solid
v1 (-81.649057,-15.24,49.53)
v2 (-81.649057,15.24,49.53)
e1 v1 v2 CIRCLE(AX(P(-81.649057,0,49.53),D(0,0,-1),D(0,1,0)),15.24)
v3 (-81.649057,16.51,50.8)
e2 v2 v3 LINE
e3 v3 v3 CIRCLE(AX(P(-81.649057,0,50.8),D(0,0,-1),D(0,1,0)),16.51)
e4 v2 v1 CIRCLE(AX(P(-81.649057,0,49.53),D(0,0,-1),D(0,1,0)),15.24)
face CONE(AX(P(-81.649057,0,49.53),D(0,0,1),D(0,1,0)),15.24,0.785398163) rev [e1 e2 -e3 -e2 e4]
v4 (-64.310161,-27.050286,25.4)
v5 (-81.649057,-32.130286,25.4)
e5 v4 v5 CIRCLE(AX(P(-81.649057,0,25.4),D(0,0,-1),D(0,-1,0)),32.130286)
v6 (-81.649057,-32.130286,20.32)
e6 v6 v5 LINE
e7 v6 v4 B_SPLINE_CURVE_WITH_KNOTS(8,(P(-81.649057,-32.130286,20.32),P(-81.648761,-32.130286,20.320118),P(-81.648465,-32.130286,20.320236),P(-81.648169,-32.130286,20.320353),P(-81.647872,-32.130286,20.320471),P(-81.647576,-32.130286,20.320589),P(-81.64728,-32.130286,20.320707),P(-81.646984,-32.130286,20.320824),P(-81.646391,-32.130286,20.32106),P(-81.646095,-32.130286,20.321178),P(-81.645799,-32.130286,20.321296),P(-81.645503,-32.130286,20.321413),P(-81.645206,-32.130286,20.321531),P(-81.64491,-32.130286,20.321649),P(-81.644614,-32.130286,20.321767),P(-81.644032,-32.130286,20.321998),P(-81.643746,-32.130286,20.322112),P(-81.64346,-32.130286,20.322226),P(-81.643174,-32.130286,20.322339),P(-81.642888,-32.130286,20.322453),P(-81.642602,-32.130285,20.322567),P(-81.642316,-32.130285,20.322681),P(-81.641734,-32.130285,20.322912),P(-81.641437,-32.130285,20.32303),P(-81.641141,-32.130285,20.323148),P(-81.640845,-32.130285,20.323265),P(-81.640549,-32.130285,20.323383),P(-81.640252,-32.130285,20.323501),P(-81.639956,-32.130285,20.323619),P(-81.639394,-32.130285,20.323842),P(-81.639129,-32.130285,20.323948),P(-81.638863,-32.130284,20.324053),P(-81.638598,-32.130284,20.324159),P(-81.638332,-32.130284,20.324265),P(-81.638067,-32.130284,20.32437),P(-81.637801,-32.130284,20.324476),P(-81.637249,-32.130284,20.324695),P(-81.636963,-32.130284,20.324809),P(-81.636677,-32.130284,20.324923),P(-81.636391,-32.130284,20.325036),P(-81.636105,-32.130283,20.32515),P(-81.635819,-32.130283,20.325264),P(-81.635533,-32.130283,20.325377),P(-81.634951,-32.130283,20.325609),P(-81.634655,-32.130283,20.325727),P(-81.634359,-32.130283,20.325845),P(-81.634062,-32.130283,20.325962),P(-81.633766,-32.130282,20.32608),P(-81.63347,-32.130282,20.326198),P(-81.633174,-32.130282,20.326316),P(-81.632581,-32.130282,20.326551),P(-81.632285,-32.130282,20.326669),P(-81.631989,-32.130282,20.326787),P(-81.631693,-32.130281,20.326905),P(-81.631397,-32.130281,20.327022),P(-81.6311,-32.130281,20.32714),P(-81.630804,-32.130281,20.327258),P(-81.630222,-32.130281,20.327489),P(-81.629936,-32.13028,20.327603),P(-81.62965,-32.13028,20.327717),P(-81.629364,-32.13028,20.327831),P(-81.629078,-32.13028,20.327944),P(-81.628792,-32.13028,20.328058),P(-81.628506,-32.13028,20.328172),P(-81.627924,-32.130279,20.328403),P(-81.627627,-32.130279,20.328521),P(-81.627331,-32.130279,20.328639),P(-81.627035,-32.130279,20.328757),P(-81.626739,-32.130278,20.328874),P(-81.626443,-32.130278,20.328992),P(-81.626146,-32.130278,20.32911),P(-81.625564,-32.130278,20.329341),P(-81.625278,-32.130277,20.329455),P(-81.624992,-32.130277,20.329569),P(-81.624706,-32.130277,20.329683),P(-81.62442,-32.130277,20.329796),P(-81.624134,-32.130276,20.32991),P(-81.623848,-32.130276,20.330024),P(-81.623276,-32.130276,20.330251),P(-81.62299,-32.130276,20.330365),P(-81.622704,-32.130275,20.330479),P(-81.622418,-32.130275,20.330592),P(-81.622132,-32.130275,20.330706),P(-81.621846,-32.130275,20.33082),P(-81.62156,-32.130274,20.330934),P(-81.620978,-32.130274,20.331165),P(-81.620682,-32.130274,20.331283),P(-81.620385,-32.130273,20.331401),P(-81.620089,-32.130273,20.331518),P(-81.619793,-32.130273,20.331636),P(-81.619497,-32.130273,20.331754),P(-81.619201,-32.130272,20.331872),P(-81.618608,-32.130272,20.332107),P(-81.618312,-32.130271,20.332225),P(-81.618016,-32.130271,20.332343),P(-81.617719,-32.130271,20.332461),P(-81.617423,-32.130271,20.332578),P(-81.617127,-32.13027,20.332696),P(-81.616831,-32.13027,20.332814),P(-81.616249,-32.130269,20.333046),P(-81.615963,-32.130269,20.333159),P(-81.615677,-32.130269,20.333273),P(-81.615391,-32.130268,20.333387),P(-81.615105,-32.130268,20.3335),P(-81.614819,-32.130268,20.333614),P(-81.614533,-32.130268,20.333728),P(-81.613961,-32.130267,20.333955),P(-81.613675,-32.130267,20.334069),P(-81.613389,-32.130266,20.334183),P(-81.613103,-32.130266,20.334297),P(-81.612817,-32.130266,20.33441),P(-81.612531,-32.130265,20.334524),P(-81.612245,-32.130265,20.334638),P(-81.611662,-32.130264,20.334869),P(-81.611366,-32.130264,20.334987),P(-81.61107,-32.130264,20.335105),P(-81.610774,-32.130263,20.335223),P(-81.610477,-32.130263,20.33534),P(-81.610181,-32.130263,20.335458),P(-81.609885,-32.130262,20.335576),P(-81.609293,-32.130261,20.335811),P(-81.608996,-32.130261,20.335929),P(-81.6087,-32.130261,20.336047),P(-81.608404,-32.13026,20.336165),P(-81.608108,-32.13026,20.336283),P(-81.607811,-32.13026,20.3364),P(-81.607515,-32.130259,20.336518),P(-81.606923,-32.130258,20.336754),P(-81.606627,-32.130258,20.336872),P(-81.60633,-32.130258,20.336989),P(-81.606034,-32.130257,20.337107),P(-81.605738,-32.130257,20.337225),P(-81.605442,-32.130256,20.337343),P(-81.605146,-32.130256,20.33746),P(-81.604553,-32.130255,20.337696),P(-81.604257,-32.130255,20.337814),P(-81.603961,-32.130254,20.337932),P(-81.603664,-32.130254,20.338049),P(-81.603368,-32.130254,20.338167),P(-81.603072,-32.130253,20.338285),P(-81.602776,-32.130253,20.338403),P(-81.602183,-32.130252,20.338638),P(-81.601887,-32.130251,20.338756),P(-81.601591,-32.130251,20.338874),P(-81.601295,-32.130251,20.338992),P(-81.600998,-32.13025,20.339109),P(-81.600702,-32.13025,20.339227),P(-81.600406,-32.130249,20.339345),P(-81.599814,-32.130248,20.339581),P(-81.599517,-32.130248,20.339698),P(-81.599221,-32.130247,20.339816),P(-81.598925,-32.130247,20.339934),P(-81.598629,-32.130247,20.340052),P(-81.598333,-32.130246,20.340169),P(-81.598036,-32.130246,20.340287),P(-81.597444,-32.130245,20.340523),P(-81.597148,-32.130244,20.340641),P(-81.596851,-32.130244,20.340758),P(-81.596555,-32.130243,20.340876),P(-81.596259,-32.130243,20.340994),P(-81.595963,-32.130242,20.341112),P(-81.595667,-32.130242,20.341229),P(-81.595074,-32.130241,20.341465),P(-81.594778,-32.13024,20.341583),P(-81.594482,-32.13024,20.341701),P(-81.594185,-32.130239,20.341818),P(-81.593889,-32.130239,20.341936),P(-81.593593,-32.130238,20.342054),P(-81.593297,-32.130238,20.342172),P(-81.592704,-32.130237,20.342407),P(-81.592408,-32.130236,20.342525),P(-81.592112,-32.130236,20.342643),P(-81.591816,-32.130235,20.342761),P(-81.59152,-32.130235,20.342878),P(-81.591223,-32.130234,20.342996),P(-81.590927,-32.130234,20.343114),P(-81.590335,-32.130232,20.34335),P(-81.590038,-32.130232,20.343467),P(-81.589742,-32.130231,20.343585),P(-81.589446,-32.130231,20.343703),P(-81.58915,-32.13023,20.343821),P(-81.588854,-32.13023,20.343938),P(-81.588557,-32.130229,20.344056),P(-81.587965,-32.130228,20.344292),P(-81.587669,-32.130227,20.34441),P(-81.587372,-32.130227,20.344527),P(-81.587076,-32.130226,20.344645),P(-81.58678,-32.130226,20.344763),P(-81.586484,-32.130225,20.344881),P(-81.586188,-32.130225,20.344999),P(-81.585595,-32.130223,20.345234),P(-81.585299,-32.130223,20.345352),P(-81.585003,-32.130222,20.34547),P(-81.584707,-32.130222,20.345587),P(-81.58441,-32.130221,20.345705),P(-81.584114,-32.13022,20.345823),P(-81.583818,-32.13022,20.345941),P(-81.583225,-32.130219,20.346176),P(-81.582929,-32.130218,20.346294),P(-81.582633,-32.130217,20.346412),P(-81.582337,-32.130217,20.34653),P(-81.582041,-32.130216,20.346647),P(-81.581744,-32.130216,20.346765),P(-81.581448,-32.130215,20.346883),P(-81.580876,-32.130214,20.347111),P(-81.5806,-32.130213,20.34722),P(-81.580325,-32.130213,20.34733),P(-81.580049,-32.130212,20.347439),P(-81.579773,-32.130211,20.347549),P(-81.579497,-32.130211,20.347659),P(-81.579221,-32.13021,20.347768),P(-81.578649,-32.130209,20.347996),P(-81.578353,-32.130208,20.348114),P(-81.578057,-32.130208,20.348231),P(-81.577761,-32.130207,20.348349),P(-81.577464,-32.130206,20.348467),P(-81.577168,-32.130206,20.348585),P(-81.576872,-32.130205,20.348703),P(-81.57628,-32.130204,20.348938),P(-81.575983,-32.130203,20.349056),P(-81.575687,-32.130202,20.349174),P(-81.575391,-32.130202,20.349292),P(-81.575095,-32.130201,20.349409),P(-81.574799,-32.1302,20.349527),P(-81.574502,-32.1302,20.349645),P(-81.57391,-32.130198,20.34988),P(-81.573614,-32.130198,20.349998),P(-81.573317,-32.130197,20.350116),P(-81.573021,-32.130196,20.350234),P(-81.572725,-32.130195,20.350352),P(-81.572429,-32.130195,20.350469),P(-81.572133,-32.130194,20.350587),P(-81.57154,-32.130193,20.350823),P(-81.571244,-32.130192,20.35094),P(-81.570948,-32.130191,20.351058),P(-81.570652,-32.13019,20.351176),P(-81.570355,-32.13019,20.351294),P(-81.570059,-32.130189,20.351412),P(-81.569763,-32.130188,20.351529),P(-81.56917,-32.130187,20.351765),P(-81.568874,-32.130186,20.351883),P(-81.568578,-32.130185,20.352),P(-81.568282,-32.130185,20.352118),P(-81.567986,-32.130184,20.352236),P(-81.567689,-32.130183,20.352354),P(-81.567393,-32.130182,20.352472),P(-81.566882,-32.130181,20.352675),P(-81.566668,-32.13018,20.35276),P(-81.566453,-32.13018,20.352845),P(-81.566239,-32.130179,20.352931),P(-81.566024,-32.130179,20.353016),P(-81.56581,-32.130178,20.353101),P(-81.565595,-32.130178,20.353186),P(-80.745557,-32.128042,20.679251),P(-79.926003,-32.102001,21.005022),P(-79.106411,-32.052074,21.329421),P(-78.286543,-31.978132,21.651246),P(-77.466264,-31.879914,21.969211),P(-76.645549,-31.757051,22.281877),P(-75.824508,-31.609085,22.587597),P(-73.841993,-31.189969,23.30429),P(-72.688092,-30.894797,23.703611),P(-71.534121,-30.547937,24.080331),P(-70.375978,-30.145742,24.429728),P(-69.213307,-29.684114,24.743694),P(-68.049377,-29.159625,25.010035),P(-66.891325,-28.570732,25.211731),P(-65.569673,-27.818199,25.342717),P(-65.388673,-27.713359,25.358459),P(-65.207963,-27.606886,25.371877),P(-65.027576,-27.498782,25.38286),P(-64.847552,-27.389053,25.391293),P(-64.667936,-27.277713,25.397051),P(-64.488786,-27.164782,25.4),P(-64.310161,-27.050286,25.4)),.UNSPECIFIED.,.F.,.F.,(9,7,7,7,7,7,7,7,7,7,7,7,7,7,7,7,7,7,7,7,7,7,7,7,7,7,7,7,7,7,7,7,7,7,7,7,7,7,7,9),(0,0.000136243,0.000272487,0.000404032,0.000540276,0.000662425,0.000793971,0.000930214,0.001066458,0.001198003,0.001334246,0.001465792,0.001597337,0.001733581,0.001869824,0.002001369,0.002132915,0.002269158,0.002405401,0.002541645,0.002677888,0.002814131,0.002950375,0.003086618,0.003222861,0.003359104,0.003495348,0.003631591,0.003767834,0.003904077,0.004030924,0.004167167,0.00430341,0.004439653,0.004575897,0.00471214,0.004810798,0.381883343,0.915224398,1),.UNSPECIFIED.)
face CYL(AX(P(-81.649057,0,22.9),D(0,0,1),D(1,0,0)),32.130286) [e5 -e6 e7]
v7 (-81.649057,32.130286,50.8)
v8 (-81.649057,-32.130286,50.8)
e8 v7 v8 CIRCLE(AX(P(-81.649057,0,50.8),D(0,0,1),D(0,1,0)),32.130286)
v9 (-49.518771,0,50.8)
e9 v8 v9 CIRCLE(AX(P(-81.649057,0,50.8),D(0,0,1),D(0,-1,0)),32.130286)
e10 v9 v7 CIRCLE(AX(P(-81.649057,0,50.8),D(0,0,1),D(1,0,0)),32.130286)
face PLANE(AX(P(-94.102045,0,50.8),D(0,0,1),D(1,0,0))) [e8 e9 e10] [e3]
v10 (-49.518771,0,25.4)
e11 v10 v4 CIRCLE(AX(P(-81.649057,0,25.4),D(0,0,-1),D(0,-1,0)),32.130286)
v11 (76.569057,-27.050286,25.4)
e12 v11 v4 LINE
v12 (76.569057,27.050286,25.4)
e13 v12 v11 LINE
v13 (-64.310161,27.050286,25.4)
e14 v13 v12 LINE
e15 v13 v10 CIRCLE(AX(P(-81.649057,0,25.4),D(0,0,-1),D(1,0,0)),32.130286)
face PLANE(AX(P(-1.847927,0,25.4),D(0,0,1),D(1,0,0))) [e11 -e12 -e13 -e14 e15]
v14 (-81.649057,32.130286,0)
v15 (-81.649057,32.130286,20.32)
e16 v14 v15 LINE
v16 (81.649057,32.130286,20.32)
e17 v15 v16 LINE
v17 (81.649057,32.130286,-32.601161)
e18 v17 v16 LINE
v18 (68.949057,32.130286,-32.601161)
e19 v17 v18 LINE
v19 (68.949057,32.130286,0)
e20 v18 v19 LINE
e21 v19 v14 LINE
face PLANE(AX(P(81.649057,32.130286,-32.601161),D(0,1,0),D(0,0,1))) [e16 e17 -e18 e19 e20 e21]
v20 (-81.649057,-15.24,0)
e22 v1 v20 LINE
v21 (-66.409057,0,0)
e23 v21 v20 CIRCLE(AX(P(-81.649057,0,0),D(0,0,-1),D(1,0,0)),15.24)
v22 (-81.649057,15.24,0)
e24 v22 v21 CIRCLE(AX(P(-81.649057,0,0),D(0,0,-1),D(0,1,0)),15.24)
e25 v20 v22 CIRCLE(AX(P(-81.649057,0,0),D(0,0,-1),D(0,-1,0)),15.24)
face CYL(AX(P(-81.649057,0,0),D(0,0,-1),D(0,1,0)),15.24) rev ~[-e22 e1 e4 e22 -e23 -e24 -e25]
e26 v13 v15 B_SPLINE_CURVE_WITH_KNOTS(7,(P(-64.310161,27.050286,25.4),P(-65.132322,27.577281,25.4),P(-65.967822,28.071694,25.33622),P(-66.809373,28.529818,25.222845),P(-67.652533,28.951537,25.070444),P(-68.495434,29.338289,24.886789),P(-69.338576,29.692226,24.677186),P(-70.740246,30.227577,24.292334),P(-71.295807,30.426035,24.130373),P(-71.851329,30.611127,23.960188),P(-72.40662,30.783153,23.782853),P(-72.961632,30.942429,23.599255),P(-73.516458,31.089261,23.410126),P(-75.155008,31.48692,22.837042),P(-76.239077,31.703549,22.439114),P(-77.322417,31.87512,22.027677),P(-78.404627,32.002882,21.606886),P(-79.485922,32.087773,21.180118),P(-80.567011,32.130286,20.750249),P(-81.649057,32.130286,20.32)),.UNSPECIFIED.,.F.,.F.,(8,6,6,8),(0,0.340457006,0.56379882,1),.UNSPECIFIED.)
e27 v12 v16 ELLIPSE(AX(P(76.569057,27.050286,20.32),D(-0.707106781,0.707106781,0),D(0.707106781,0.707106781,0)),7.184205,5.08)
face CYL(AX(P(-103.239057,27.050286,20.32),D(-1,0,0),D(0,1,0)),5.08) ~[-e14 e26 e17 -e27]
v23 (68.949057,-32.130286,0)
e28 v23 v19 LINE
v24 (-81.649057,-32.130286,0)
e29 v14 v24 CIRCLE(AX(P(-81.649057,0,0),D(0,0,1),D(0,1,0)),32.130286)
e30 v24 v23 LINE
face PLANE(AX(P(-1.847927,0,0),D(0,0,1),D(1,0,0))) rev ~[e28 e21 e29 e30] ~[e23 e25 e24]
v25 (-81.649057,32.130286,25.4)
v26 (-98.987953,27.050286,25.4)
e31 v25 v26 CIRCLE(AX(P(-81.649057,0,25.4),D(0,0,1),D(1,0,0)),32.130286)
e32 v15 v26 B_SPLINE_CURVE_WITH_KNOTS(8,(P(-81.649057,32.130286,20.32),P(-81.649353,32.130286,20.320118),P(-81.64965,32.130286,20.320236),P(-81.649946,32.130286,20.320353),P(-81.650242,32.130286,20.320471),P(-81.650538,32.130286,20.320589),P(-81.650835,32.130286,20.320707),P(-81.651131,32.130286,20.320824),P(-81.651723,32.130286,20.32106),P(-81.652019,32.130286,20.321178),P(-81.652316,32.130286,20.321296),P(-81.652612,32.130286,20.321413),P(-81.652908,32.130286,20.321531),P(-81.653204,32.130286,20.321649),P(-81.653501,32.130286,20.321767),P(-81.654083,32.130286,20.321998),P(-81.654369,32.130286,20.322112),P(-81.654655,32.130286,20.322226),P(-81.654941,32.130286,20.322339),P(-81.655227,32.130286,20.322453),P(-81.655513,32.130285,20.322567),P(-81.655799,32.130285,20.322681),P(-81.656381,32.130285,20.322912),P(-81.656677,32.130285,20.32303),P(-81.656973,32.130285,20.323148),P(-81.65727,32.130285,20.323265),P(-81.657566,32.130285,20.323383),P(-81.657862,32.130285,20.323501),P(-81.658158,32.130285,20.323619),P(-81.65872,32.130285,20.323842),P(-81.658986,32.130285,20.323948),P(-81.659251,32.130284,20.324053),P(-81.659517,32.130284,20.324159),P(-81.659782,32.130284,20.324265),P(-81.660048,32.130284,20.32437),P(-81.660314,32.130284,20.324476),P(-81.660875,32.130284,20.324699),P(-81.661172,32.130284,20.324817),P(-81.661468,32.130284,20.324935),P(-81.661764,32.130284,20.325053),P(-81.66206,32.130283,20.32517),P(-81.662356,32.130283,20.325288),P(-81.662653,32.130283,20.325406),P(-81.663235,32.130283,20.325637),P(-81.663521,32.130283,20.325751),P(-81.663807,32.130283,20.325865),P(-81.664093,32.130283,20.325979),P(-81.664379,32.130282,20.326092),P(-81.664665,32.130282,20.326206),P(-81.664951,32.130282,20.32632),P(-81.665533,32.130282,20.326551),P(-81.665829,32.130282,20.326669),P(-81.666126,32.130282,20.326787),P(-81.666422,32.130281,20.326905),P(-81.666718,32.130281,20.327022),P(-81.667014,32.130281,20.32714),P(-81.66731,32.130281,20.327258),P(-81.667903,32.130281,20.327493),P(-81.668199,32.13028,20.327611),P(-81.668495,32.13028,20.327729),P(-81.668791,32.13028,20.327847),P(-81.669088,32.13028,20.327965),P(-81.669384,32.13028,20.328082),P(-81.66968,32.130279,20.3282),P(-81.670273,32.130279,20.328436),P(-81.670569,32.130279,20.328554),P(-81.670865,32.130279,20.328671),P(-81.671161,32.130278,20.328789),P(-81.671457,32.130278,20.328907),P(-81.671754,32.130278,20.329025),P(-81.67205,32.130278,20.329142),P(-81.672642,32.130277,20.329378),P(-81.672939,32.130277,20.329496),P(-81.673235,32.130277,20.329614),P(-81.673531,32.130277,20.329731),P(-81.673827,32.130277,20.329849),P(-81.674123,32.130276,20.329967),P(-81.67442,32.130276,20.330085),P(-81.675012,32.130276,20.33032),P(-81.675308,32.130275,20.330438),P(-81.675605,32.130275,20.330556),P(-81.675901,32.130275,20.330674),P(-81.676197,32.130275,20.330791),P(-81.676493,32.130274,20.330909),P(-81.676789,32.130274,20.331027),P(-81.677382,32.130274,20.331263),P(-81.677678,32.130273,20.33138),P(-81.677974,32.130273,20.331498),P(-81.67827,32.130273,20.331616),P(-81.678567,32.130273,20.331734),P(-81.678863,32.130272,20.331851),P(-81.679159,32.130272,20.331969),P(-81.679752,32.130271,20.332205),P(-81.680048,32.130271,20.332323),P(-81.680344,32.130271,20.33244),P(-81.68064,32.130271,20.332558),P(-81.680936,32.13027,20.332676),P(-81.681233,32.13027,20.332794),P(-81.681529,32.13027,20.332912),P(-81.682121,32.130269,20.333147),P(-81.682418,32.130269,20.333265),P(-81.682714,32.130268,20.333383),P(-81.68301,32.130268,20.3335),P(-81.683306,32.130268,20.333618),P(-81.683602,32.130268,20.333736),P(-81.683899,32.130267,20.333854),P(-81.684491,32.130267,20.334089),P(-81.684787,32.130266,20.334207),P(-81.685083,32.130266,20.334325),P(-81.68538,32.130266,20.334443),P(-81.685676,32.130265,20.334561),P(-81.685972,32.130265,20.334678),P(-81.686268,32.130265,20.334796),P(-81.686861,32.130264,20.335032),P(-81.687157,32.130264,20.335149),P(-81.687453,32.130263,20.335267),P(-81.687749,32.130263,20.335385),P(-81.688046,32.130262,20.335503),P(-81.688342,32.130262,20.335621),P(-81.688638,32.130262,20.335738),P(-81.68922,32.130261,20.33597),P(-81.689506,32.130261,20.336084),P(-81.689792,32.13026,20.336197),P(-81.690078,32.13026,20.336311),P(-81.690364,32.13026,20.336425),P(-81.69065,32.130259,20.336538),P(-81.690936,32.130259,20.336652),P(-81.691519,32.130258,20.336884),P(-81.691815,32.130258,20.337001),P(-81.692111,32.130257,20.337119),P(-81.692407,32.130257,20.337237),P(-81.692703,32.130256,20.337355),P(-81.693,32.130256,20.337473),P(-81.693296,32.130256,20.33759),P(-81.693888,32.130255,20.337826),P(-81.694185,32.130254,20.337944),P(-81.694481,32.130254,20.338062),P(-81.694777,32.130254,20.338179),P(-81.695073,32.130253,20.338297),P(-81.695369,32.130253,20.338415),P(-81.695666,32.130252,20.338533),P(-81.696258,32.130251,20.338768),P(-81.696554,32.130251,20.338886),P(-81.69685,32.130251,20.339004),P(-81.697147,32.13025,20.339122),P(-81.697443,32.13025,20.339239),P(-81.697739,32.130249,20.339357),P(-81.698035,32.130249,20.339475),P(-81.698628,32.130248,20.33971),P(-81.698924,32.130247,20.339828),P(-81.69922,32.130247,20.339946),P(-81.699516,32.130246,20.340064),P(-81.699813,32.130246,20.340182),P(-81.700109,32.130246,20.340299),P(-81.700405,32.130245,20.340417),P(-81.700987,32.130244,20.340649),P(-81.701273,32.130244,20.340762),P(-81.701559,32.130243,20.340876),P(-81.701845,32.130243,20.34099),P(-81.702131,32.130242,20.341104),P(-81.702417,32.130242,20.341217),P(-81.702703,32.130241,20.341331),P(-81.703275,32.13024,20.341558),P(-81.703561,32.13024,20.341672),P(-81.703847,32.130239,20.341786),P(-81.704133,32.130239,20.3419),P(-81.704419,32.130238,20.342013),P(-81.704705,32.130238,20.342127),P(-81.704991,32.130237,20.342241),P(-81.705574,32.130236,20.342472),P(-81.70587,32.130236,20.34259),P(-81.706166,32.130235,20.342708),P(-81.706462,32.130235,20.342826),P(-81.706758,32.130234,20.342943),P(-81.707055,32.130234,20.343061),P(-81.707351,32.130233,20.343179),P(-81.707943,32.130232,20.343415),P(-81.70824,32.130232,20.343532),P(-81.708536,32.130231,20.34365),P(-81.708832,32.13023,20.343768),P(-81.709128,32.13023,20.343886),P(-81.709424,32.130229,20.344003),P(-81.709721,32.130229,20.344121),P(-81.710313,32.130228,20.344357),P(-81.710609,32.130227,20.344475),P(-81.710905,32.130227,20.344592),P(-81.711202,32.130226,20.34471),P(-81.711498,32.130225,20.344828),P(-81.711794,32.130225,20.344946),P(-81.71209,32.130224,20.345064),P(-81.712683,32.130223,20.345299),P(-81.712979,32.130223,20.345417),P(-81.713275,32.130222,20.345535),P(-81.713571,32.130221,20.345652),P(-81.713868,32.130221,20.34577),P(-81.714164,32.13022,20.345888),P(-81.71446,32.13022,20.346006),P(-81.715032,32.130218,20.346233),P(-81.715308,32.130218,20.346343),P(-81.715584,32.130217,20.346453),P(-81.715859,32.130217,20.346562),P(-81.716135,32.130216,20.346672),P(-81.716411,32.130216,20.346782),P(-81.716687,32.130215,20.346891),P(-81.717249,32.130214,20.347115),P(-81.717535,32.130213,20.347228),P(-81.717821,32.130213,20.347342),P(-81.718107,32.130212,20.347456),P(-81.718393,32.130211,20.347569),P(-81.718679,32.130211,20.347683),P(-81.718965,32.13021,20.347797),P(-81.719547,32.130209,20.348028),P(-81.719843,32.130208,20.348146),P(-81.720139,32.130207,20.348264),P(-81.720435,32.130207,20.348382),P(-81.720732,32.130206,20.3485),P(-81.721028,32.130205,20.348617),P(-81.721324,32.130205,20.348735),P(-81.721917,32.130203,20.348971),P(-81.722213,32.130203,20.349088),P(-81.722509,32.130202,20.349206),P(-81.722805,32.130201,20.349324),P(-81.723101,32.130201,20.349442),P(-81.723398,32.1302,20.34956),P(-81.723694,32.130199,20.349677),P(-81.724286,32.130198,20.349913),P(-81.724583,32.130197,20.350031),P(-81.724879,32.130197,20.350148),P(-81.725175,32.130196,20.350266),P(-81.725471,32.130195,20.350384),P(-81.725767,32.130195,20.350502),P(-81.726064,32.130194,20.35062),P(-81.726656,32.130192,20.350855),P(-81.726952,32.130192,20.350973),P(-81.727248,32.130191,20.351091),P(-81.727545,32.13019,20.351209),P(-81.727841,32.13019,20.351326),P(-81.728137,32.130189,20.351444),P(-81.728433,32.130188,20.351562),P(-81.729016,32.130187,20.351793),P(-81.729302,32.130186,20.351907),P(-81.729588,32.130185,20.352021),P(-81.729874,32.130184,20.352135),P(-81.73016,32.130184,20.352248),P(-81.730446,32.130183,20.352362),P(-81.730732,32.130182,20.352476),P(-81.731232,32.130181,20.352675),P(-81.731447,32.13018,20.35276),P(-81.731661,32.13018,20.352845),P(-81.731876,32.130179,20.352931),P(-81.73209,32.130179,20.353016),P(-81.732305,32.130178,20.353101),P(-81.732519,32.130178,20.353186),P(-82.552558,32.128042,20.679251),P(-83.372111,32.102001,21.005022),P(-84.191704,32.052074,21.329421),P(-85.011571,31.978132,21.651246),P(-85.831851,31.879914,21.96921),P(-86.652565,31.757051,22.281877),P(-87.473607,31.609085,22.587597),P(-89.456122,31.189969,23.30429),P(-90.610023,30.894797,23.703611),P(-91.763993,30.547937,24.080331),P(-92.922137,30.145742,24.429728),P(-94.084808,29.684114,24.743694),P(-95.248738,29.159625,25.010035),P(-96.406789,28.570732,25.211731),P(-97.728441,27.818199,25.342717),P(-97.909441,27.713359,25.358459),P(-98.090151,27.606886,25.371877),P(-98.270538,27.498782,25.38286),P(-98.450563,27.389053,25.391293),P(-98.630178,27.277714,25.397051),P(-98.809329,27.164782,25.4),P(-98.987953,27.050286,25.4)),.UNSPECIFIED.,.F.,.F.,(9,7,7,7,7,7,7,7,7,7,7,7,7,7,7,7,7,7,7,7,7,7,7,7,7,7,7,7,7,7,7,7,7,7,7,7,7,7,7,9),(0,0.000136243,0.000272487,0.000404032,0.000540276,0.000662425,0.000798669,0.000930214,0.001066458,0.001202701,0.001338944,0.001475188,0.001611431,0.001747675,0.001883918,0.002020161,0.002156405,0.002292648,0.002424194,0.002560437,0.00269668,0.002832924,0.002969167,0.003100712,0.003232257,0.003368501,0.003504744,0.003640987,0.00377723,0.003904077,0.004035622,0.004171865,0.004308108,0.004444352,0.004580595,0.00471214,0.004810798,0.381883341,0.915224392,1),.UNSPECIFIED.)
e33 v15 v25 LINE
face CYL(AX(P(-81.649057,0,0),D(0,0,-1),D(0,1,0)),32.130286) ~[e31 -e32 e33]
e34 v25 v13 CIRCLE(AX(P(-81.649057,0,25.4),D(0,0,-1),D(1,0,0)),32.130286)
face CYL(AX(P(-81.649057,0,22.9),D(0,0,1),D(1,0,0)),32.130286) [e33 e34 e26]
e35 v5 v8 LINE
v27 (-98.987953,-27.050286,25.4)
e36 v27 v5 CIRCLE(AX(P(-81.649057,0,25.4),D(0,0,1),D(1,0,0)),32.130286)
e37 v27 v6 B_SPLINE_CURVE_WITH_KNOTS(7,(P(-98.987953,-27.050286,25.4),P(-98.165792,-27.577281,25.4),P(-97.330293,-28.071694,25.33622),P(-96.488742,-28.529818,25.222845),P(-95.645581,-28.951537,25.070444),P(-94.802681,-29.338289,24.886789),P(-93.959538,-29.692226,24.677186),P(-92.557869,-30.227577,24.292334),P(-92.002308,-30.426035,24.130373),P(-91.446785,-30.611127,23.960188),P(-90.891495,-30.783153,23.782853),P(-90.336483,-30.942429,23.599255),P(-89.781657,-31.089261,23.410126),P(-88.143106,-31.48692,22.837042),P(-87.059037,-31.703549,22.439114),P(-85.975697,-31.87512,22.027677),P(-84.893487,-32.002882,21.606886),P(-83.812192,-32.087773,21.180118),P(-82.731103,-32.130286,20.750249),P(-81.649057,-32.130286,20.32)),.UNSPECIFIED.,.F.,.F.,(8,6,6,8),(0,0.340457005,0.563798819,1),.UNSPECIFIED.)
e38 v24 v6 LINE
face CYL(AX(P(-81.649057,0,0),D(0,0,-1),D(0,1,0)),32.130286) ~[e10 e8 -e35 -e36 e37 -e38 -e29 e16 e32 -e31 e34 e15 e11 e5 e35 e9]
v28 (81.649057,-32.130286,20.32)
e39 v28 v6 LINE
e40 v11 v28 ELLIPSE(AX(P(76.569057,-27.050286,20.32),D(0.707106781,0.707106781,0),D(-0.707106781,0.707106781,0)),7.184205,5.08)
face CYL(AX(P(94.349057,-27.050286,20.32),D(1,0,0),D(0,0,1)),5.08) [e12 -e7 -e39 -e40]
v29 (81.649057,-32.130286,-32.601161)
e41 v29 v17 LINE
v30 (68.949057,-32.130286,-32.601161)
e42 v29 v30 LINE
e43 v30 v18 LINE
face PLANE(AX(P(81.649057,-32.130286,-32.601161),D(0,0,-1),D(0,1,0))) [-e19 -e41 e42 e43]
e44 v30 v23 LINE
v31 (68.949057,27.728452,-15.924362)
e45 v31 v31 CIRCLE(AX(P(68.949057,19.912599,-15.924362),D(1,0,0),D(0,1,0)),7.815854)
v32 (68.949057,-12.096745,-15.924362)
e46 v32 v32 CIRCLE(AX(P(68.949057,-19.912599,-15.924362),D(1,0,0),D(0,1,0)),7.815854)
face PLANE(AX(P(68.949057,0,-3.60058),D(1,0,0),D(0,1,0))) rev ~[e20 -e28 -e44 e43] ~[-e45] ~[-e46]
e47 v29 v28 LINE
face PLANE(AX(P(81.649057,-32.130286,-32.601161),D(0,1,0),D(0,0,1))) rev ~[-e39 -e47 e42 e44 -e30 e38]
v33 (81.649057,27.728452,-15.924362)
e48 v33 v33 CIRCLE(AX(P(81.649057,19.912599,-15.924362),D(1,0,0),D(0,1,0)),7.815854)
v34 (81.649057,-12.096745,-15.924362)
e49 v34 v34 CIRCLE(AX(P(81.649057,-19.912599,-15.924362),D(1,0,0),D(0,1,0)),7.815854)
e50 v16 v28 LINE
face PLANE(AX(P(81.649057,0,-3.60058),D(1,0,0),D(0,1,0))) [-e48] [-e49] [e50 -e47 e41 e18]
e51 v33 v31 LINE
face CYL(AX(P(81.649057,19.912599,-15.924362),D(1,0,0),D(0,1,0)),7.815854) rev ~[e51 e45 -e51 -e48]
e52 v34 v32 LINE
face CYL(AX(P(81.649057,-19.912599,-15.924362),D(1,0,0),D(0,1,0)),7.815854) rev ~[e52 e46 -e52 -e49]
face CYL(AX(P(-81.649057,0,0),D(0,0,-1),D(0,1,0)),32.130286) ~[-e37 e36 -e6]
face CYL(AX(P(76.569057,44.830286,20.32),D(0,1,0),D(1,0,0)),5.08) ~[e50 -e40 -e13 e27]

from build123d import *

# Parameters (mm, degrees)
F1_DEPTH     = 25.4
F2_DEPTH     = 50.8
F3_W         = 64.2605721951
F3_H         = 58.0011609286
F3_R         = 7.8158537252
F4_DEPTH     = 12.7
F5_T1_DEPTH  = 89.6605721951
F5_T6_DEPTH  = 197.5881144994
F5_S7_R      = 32.1302860975
F5_T8_DEPTH  = 100
F5_T12_DEPTH = 197.5881144994
F5_S13_R     = 32.1302860975
F5_T14_DEPTH = 100


# Not quite as in the source:
# - a fillet or chamfer that OpenCascade refuses, or shapes differently, is made with other operations: its cross-section is extruded or revolved along the edge and cut away or added


with BuildPart() as f1:
    # F0 (on Top) → F1 (new body)
    with BuildSketch(Plane.XY):
        with BuildLine():
            Line((81.6490572497, -32.1302860975), (81.6490572497, 32.1302860975))
            Line((81.6490572497, 32.1302860975), (-81.6490572497, 32.1302860975))
            ThreePointArc((-81.6490572497, 32.1302860975), (-58.9295140687, 22.719543181), (-49.5187711522, 0))
            ThreePointArc((-49.5187711522, 0), (-58.9295140687, -22.719543181), (-81.6490572497, -32.1302860975))
            Line((-81.6490572497, -32.1302860975), (81.6490572497, -32.1302860975))
        make_face()
        with BuildLine():
            Line((-81.6490572497, 15.24), (-81.6490572497, 32.1302860975))
            ThreePointArc((-81.6490572497, 32.1302860975), (-113.7793433473, 0), (-81.6490572497, -32.1302860975))
            Line((-81.6490572497, -32.1302860975), (-81.6490572497, -15.24))
            ThreePointArc((-81.6490572497, -15.24), (-96.8890572497, 0), (-81.6490572497, 15.24))
        make_face()
        with BuildLine():
            ThreePointArc((-49.5187711522, 0), (-58.9295140687, 22.719543181), (-81.6490572497, 32.1302860975))
            Line((-81.6490572497, 32.1302860975), (-81.6490572497, 15.24))
            ThreePointArc((-81.6490572497, 15.24), (-70.8727499044, 10.7763073453), (-66.4090572497, 0))
            ThreePointArc((-66.4090572497, 0), (-70.8727499044, -10.7763073453), (-81.6490572497, -15.24))
            Line((-81.6490572497, -15.24), (-81.6490572497, -32.1302860975))
            ThreePointArc((-81.6490572497, -32.1302860975), (-58.9295140687, -22.719543181), (-49.5187711522, 0))
        make_face()
    extrude(amount=F1_DEPTH)

    # F0 (on Top) → F2 (join)
    with BuildSketch(Plane.XY):
        with BuildLine():
            Line((-81.6490572497, 15.24), (-81.6490572497, 32.1302860975))
            ThreePointArc((-81.6490572497, 32.1302860975), (-113.7793433473, 0), (-81.6490572497, -32.1302860975))
            Line((-81.6490572497, -32.1302860975), (-81.6490572497, -15.24))
            ThreePointArc((-81.6490572497, -15.24), (-96.8890572497, 0), (-81.6490572497, 15.24))
        make_face()
        with BuildLine():
            ThreePointArc((-49.5187711522, 0), (-58.9295140687, 22.719543181), (-81.6490572497, 32.1302860975))
            Line((-81.6490572497, 32.1302860975), (-81.6490572497, 15.24))
            ThreePointArc((-81.6490572497, 15.24), (-70.8727499044, 10.7763073453), (-66.4090572497, 0))
            ThreePointArc((-66.4090572497, 0), (-70.8727499044, -10.7763073453), (-81.6490572497, -15.24))
            Line((-81.6490572497, -15.24), (-81.6490572497, -32.1302860975))
            ThreePointArc((-81.6490572497, -32.1302860975), (-58.9295140687, -22.719543181), (-49.5187711522, 0))
        make_face()
    extrude(amount=F2_DEPTH)

    # F3 (on face) → F4 (join)
    with BuildSketch(Plane.YZ.offset(81.6490572497)):
        with Locations((0, -3.6005804643)):
            Rectangle(F3_W, F3_H)
        with Locations((-19.9125986546, -15.9243624657)):
            Circle(F3_R, mode=Mode.SUBTRACT)
        with Locations((19.9125986546, -15.9243624657)):
            Circle(F3_R, mode=Mode.SUBTRACT)
    extrude(amount=-F4_DEPTH)

    # F5: fillet of radius 5.08 on 3 edges, made by hand

    # F5_s2 → F5_t1 (cut)
    with BuildSketch(Plane.XZ.offset(-44.8302860975)):
        with BuildLine():
            ThreePointArc((81.6490572497, 20.32), (80.1611596982, 23.9121024484), (76.5690572497, 25.4))
            Line((76.5690572497, 25.4), (81.6490572497, 25.4))
            Line((81.6490572497, 25.4), (81.6490572497, 20.32))
        make_face()
    extrude(amount=F5_T1_DEPTH, mode=Mode.SUBTRACT)


with BuildPart() as f5_tool4:
    # F5_s5 → F5_t6 (new body)
    with BuildSketch(Plane.YZ.offset(94.3490572497)):
        with BuildLine():
            ThreePointArc((-27.0502860975, 25.4), (-30.642388546, 23.9121024484), (-32.1302860975, 20.32))
            Line((-32.1302860975, 20.32), (-32.1302860975, 25.4))
            Line((-32.1302860975, 25.4), (-27.0502860975, 25.4))
        make_face()
    extrude(amount=-F5_T6_DEPTH)

    # F5_s7 → F5_t8 (cut, symmetric)
    with BuildSketch(Plane.XY.offset(22.9)):
        with Locations((-81.6490572497, 0)):
            Circle(F5_S7_R)
    extrude(amount=F5_T8_DEPTH, both=True, mode=Mode.SUBTRACT)


with BuildPart() as f1_1:
    add(f1.part)

    # F5_t3: cut F5_tool4
    add(f5_tool4.part, mode=Mode.SUBTRACT)


with BuildPart() as f5_tool10:
    # F5_s11 → F5_t12 (new body)
    with BuildSketch(Plane.YZ.offset(-103.2390572497)):
        with BuildLine():
            ThreePointArc((32.1302860975, 20.32), (30.642388546, 23.9121024484), (27.0502860975, 25.4))
            Line((27.0502860975, 25.4), (32.1302860975, 25.4))
            Line((32.1302860975, 25.4), (32.1302860975, 20.32))
        make_face()
    extrude(amount=F5_T12_DEPTH)

    # F5_s13 → F5_t14 (cut, symmetric)
    with BuildSketch(Plane.XY.offset(22.9)):
        with Locations((-81.6490572497, 0)):
            Circle(F5_S13_R)
    extrude(amount=F5_T14_DEPTH, both=True, mode=Mode.SUBTRACT)


with BuildPart() as f1_2:
    add(f1_1.part)

    # F5_t9: cut F5_tool10
    add(f5_tool10.part, mode=Mode.SUBTRACT)

    # F6: chamfer of 1.27 on 1 edges, made by hand

    # F6_s1 → F6_t2 (revolve, cut)
    with BuildSketch(Plane.YZ.offset(-81.6490572497)):
        Polygon((15.24, 49.53), (16.51, 50.8), (15.24, 50.8), align=None)
    revolve(axis=Axis((-81.6490572497, 0, 50.8), (0, 0, -1)), mode=Mode.SUBTRACT)


solid = f1_2.part
